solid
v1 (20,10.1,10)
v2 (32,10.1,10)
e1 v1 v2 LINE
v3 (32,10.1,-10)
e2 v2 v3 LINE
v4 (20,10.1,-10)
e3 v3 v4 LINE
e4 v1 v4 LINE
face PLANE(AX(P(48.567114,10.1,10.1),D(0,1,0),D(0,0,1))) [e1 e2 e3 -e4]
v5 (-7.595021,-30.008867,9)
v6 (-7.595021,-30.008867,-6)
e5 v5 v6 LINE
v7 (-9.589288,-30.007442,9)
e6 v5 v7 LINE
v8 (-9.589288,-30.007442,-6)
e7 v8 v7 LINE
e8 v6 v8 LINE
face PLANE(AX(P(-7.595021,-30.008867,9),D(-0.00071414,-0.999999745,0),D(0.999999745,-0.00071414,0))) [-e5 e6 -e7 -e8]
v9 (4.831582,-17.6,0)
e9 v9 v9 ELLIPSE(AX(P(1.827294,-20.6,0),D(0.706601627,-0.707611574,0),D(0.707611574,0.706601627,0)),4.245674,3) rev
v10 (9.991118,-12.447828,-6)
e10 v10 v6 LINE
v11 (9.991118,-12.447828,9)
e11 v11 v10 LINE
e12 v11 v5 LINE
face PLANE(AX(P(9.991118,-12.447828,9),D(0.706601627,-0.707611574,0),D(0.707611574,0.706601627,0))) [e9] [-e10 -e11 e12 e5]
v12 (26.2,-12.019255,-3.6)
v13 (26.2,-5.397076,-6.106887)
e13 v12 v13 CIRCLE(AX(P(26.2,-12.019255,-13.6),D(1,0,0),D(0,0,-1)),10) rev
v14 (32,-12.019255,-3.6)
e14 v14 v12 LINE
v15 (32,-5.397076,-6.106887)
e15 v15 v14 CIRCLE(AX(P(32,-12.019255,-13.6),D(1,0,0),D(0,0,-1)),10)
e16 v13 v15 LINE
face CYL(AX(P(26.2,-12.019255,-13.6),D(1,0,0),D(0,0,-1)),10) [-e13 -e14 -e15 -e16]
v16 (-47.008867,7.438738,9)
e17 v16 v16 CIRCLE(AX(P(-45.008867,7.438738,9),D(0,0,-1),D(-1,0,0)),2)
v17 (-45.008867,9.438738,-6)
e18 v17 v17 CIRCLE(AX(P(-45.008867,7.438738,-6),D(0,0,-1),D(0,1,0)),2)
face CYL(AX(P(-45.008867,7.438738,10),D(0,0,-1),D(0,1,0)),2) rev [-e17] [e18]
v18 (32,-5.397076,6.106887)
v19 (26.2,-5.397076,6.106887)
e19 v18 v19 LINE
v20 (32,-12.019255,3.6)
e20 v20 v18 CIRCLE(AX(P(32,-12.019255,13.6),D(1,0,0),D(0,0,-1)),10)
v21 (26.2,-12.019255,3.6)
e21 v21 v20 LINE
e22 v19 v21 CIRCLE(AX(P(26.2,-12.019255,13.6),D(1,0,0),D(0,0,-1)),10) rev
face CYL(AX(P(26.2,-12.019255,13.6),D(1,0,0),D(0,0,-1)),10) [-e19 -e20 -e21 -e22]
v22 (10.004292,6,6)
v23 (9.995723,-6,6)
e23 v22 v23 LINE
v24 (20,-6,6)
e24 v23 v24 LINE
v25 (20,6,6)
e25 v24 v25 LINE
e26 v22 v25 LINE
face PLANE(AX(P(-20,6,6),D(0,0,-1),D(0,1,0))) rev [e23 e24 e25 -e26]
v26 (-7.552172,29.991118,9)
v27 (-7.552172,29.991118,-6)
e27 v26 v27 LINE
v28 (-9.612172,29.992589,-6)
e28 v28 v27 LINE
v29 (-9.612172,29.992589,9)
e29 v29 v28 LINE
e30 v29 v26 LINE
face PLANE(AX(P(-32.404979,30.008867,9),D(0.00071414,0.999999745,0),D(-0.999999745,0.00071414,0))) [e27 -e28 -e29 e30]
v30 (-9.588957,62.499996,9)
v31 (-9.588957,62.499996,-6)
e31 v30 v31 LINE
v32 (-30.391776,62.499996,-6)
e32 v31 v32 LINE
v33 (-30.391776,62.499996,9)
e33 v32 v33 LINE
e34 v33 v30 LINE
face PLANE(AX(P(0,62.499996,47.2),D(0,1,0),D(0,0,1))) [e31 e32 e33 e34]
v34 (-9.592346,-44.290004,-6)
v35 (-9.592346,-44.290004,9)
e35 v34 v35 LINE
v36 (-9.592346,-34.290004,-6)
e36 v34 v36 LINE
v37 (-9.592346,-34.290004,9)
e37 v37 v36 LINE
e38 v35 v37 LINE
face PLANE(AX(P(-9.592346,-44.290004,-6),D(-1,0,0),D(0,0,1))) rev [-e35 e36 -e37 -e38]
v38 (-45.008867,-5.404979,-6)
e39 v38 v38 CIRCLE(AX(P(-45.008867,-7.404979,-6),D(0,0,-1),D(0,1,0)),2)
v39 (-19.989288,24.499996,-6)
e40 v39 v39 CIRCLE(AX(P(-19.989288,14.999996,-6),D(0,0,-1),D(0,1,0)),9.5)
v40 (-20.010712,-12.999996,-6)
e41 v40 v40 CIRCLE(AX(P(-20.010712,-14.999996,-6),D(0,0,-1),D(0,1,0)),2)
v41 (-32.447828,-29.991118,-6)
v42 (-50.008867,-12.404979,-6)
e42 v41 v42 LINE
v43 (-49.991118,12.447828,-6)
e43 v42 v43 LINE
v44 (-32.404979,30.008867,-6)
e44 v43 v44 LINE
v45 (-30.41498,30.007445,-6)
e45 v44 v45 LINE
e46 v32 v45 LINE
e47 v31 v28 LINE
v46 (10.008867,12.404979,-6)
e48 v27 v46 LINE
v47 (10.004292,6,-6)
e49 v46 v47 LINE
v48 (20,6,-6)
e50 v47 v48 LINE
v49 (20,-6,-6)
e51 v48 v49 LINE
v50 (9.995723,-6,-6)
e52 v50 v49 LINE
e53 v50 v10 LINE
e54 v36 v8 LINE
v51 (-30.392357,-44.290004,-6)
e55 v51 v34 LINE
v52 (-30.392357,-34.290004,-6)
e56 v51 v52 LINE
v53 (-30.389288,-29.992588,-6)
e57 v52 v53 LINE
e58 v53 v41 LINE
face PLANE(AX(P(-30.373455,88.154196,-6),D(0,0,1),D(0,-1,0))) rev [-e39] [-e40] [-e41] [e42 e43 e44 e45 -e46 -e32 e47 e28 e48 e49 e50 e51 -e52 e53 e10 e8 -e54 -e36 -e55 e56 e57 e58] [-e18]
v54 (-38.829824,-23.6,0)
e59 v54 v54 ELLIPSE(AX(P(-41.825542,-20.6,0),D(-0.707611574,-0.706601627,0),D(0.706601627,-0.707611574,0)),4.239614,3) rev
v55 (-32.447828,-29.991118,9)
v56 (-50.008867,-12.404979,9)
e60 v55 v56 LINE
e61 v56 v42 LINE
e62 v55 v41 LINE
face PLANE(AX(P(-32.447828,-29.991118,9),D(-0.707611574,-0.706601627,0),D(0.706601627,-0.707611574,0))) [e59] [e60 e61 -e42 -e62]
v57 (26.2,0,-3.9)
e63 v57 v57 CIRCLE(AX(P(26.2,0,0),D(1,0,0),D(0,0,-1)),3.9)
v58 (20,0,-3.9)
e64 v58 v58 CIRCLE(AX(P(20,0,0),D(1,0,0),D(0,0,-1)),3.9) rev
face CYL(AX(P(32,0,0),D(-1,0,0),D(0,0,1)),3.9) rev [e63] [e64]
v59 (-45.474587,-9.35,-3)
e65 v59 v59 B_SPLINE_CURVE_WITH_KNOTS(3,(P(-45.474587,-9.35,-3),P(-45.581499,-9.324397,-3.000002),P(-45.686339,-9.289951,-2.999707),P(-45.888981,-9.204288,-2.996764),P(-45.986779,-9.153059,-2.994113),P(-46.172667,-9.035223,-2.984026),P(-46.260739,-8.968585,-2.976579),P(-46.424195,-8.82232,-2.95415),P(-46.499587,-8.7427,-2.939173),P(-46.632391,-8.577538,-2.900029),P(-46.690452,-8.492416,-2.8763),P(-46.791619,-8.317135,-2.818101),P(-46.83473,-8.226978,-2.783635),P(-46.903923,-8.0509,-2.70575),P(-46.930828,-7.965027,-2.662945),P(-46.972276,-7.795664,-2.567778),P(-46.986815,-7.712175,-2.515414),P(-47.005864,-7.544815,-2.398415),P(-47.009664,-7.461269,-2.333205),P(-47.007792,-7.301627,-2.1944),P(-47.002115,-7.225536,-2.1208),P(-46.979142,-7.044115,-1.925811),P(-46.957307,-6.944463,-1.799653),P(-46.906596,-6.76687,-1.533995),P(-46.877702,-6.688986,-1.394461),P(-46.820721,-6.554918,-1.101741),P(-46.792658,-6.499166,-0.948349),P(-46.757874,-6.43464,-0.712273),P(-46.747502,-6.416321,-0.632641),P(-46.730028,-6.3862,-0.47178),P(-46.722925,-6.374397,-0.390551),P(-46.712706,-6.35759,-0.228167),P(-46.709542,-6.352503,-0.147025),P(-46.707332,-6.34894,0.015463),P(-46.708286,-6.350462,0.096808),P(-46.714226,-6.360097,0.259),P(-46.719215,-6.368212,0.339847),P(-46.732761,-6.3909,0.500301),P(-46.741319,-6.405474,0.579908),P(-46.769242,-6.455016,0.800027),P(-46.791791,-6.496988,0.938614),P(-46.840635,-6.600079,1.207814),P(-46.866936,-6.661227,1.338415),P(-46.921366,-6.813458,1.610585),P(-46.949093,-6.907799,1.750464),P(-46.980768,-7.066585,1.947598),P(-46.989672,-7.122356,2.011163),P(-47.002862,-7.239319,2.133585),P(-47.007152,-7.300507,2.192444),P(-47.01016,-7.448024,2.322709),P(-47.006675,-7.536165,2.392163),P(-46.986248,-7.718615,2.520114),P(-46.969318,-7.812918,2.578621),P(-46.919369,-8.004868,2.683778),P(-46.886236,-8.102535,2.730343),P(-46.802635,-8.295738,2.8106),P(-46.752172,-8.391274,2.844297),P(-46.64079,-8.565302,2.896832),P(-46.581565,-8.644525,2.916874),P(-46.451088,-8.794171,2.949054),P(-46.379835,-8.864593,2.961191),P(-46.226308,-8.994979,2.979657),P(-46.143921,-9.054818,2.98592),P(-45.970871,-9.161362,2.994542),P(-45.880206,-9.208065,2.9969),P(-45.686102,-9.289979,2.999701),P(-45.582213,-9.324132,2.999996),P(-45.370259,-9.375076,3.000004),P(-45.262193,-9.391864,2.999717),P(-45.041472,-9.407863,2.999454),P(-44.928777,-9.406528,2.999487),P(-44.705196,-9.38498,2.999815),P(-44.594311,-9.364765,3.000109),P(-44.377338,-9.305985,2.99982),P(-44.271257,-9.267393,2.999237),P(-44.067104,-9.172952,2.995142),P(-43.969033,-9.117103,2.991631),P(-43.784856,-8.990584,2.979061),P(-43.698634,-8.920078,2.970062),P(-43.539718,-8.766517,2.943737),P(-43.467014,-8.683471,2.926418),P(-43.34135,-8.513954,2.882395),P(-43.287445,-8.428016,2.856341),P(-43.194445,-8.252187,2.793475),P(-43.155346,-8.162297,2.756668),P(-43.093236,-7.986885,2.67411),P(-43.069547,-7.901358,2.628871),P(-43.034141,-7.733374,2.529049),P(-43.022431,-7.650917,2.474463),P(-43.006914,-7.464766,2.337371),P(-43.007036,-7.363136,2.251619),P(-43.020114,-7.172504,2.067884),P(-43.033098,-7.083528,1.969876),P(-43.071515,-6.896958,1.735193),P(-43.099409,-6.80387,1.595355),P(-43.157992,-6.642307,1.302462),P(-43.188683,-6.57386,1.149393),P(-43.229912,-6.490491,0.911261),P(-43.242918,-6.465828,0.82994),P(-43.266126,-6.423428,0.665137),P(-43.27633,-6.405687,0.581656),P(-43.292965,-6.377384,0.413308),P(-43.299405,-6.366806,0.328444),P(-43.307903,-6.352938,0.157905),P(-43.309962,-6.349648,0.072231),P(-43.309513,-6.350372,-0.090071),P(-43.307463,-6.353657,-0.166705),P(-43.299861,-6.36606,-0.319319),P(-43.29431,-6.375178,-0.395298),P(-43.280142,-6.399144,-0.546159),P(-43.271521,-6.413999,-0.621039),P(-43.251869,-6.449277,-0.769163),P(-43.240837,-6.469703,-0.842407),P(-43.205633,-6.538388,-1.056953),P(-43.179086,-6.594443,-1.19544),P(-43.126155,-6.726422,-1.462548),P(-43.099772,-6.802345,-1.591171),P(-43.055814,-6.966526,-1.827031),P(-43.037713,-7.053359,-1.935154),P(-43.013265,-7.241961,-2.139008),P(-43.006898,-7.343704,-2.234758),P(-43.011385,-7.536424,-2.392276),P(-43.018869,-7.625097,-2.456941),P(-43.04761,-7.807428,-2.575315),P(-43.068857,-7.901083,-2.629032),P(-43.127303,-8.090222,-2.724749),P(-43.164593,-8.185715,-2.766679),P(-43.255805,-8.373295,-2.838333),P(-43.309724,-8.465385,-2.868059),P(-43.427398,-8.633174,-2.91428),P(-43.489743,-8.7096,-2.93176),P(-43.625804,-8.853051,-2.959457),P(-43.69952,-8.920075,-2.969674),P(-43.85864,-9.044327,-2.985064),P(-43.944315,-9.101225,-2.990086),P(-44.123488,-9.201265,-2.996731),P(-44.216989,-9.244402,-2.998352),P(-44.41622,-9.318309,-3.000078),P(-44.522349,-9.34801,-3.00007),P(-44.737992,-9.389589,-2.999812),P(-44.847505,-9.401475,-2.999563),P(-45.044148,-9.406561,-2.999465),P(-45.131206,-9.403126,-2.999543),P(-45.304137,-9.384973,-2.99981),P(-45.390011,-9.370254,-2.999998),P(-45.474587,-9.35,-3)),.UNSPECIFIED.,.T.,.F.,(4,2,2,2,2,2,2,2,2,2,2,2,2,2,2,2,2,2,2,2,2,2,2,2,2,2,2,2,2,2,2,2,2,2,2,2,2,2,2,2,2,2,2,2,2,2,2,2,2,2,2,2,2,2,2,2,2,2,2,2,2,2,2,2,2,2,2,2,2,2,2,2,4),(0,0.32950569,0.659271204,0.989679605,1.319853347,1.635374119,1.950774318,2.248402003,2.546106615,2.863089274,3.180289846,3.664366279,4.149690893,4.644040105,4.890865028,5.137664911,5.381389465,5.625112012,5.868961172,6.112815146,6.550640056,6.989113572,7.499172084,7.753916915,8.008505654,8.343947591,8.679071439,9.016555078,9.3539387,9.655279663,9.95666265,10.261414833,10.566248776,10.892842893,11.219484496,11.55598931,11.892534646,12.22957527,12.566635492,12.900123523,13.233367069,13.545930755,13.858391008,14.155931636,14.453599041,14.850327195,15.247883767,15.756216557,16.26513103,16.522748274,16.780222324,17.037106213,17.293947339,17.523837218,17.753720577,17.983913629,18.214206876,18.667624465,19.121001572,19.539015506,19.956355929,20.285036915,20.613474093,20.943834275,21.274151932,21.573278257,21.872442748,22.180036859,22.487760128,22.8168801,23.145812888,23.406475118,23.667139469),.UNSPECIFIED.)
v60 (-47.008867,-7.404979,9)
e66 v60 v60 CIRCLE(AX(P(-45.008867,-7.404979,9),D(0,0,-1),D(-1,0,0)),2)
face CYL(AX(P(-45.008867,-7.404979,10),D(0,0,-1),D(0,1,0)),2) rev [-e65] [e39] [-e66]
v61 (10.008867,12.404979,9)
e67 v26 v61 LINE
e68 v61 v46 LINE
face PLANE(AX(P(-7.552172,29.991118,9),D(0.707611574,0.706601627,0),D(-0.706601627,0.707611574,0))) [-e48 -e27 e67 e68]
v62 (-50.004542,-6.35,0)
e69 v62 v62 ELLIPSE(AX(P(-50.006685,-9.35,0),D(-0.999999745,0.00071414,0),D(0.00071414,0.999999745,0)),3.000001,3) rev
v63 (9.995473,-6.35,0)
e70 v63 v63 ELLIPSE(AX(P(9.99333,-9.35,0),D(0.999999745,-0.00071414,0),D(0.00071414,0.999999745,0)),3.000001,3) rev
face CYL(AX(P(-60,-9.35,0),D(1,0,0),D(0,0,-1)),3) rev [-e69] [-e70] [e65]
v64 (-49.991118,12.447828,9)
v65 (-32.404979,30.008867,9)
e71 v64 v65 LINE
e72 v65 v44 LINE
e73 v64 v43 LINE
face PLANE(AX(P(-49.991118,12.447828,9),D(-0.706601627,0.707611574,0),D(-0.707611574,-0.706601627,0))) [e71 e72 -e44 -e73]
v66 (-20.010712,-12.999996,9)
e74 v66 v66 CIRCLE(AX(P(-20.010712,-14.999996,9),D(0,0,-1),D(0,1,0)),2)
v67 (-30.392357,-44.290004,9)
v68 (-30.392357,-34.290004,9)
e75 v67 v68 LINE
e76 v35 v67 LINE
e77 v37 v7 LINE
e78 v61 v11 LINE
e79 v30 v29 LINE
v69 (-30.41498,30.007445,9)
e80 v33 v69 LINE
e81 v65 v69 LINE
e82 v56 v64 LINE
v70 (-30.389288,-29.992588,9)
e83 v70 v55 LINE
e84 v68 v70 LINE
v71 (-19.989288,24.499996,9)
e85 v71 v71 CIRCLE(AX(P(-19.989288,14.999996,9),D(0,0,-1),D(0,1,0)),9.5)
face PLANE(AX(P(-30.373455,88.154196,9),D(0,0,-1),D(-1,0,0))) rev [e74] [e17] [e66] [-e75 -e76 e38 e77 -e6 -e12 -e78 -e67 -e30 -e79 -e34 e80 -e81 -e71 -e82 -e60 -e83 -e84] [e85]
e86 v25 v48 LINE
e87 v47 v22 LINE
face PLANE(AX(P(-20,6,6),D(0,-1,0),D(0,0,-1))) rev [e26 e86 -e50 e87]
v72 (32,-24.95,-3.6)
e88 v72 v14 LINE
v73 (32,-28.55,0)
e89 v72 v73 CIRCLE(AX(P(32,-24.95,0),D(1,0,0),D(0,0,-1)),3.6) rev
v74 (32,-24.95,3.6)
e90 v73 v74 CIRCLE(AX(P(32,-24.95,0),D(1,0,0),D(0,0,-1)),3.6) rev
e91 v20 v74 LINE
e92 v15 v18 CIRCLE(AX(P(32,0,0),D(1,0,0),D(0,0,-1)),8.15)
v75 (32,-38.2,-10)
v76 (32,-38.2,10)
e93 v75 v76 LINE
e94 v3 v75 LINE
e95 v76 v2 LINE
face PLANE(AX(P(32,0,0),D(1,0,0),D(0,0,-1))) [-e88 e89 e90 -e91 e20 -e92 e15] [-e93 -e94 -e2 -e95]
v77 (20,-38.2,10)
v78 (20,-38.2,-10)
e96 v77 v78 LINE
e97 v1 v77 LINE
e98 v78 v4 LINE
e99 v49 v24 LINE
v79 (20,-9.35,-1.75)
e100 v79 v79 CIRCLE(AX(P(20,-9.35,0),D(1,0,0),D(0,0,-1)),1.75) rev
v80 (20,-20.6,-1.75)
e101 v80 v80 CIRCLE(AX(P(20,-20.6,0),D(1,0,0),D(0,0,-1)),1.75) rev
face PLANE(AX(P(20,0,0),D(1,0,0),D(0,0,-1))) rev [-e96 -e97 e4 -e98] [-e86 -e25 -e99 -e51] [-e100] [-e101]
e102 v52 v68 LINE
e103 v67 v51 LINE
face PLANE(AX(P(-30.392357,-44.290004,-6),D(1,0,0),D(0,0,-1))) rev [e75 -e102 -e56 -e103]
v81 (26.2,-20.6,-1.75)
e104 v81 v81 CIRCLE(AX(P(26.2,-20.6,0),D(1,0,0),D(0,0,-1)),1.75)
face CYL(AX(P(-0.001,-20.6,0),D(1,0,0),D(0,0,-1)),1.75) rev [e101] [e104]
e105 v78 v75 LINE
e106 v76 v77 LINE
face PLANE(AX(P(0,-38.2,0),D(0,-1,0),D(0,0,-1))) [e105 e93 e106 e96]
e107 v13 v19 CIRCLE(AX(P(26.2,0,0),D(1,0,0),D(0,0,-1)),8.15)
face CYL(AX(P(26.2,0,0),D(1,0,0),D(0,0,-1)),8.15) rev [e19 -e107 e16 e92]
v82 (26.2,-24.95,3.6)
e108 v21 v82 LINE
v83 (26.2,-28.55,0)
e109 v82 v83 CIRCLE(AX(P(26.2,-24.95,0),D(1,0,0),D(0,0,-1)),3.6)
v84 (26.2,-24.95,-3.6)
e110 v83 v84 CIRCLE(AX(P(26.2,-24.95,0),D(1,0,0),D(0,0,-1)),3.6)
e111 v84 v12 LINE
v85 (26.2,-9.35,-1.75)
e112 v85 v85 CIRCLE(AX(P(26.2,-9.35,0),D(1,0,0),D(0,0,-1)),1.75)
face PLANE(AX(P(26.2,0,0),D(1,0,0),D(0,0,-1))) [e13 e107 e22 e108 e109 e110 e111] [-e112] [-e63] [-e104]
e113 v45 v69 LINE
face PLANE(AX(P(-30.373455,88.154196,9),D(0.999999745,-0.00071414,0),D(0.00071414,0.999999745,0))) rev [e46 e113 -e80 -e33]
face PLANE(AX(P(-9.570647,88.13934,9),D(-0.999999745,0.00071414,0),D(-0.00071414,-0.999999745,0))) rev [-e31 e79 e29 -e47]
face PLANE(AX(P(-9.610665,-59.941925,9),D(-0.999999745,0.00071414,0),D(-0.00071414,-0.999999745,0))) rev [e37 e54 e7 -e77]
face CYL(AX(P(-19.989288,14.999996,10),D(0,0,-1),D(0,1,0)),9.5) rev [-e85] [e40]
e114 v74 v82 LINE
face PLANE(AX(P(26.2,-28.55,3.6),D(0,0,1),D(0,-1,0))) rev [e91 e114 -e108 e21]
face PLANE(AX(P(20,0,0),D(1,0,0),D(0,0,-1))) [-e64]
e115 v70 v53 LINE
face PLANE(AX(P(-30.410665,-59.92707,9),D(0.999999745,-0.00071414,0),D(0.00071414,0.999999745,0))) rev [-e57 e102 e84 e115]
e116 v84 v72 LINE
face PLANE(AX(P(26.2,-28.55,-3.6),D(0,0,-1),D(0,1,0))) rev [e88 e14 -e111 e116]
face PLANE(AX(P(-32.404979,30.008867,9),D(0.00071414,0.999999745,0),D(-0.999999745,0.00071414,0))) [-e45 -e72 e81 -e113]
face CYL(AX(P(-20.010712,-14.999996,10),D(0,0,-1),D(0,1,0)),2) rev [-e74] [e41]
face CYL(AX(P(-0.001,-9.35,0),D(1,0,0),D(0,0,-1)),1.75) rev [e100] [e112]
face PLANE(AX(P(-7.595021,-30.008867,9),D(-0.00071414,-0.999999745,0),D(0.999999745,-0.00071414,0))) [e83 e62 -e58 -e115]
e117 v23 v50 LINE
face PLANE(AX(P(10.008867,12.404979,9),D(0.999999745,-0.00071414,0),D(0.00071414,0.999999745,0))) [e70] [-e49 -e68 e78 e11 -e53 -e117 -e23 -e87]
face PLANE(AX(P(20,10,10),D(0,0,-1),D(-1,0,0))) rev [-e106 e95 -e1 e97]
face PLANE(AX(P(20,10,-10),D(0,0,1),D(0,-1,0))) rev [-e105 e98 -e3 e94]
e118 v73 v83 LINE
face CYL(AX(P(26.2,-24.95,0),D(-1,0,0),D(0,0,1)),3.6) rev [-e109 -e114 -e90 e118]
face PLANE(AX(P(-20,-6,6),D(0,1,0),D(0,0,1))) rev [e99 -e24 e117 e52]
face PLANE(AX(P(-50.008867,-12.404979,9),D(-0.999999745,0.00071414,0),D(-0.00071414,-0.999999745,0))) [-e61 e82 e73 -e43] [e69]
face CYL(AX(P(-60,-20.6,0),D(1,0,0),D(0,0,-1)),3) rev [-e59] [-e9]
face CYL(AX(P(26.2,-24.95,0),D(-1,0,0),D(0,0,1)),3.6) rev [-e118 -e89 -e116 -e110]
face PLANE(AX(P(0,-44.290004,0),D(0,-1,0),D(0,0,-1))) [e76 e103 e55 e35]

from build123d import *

# Parameters (mm, degrees)
SKETCH1_W            = 20
SKETCH1_H            = 20
BOSS_EXTRUDE1_DEPTH  = 20
SKETCH2_W            = 45
SKETCH2_H            = 70
BOSS_EXTRUDE2_DEPTH  = 12
CUT_EXTRUDE1_DEPTH   = 5.8
FILLET1_R            = 3.6
FILLET2_R            = 10
SKETCH5_R            = 3.9
CUT_EXTRUDE2_DEPTH   = 53.490475326
CUT_EXTRUDE3_REACH   = 51.17
SKETCH6_R            = 1.75
SKETCH7_W            = 12
SKETCH7_H            = 45
CUT_EXTRUDE4_DEPTH   = 4.8
SKETCH9_W            = 12
SKETCH9_H            = 45
CUT_EXTRUDE5_DEPTH   = 23.8
SKETCH10_W           = 12.5
SKETCH10_H           = 41.4
CUT_EXTRUDE6_DEPTH   = 23.8
SKETCH11_W           = 20
SKETCH11_H           = 1.2
CUT_EXTRUDE7_DEPTH   = 23.8
BOSS_EXTRUDE3_START  = 20
SKETCH12_W           = 20
SKETCH12_H           = 20
SKETCH12_R           = 3.9
BOSS_EXTRUDE3_DEPTH  = 20
SKETCH13_W           = 20.2
SKETCH13_H           = 20.2
SKETCH13_R           = 3.9
BOSS_EXTRUDE4_DEPTH  = 40
SKETCH14_W           = 12
SKETCH14_H           = 20
BOSS_EXTRUDE5_DEPTH  = 0.1
SKETCH17_R           = 4.83091966
BOSS_EXTRUDE8_DEPTH  = 39
SKETCH18_W           = 20.2
SKETCH18_H           = 20.2
CUT_EXTRUDE8_DEPTH   = 40
SKETCH20_W           = 12
SKETCH20_H           = 20
BOSS_EXTRUDE9_DEPTH  = 8
SKETCH21_W           = 12
SKETCH21_H           = 12
BOSS_EXTRUDE10_DEPTH = 40
BOSS_EXTRUDE11_DEPTH = 15
SKETCH27_R           = 2
SKETCH27_R_2         = 9.5
CUT_EXTRUDE10_DEPTH  = 65.931708229
BOSS_EXTRUDE12_DEPTH = 38.2
BOSS_EXTRUDE13_REACH = 117.263
SKETCH29_W           = 20.800005304
SKETCH29_H           = 15
BOSS_EXTRUDE14_START = -6
BOSS_EXTRUDE14_DEPTH = 15
SKETCH33_W           = 20.8
SKETCH33_H           = 10
BOSS_EXTRUDE15_DEPTH = 8.09
SKETCH34_W           = 20.8
SKETCH34_H           = 10
BOSS_EXTRUDE16_DEPTH = 27.8
SKETCH35_W           = 20.8
SKETCH35_H           = 96.79
CUT_EXTRUDE11_DEPTH  = 38.2
SKETCH36_W           = 20.800010608
SKETCH36_H           = 15
BOSS_EXTRUDE17_DEPTH = 10
CUT_EXTRUDE12_DEPTH  = 82.628035964
SKETCH39_R           = 3
CUT_EXTRUDE13_DEPTH  = 80


# Read off the part's stored shape, not the designer's step: Boss-Extrude14
with BuildPart() as part:
    # Sketch1 → Boss-Extrude1 (new body)
    with BuildSketch(Plane(origin=(0, 0, 0), x_dir=(0, 0, -1), z_dir=(1, 0, 0))):
        Rectangle(SKETCH1_W, SKETCH1_H)
    extrude(amount=BOSS_EXTRUDE1_DEPTH)

    # Sketch2 → Boss-Extrude2 (add)
    with BuildSketch(Plane(origin=(20, 0, 0), x_dir=(0, 0, -1), z_dir=(1, 0, 0))):
        Rectangle(SKETCH2_W, SKETCH2_H)
    extrude(amount=BOSS_EXTRUDE2_DEPTH)

    # Sketch4 → Cut-Extrude1 (cut)
    with BuildSketch(Plane(origin=(32, 0, 0), x_dir=(0, 0, -1), z_dir=(1, 0, 0))):
        with BuildLine():
            Line((3.6, -28.55), (-3.6, -28.55))
            Line((-3.6, -28.55), (-3.6, -7.311805523))
            ThreePointArc((-3.6, -7.311805523), (0, 8.15), (3.6, -7.311805523))
            Line((3.6, -7.311805523), (3.6, -28.55))
        make_face()
    extrude(amount=-CUT_EXTRUDE1_DEPTH, mode=Mode.SUBTRACT)

    # Fillet1
    fillet1_edges = [part.edges().sort_by_distance(p)[0] for p in [
        (29.1, -28.55, 3.6),
        (29.1, -28.55, -3.6),
    ]]
    fillet(fillet1_edges, radius=FILLET1_R - 0.0001)  # a hair under: the kernel refuses the full size

    # Fillet2
    fillet2_edges = [part.edges().sort_by_distance(p)[0] for p in [
        (29.1, -7.311805523, 3.6),
        (29.1, -7.311805523, -3.6),
    ]]
    fillet(fillet2_edges, radius=FILLET2_R)

    # Sketch5 → Cut-Extrude2 (cut, through all)
    with BuildSketch(Plane.ZY):
        Circle(SKETCH5_R)
    extrude(amount=-CUT_EXTRUDE2_DEPTH, mode=Mode.SUBTRACT)

    # Sketch6 → Cut-Extrude3 (cut, up to next)
    with BuildSketch(Plane(origin=(26.2, 0, 0), x_dir=(0, 0, -1), z_dir=(1, 0, 0)), mode=Mode.PRIVATE) as cut_extrude3_sk1:
        with Locations((0, -20.6)):
            Circle(SKETCH6_R)
    cut_extrude3_tool1 = extrude(cut_extrude3_sk1.sketch, amount=-CUT_EXTRUDE3_REACH, mode=Mode.PRIVATE) & part.part
    # Sketch6 → Cut-Extrude3 (cut, up to next)
    with BuildSketch(Plane(origin=(26.2, 0, 0), x_dir=(0, 0, -1), z_dir=(1, 0, 0)), mode=Mode.PRIVATE) as cut_extrude3_sk2:
        with Locations((0, -9.35)):
            Circle(SKETCH6_R)
    cut_extrude3_tool2 = extrude(cut_extrude3_sk2.sketch, amount=-CUT_EXTRUDE3_REACH, mode=Mode.PRIVATE) & part.part
    add(cut_extrude3_tool1.solids().sort_by_distance((26.2, -20.6, 0))[0], mode=Mode.SUBTRACT)
    add(cut_extrude3_tool2.solids().sort_by_distance((26.2, -9.35, 0))[0], mode=Mode.SUBTRACT)

    # Sketch7 → Cut-Extrude4 (cut)
    with BuildSketch(Plane.XZ.offset(35)):
        with Locations((26, 0)):
            Rectangle(SKETCH7_W, SKETCH7_H)
    extrude(amount=-CUT_EXTRUDE4_DEPTH, mode=Mode.SUBTRACT)

    # Sketch9 → Cut-Extrude5 (cut)
    with BuildSketch(Plane(origin=(0, 35, 0), x_dir=(1, 0, 0), z_dir=(0, 1, 0))):
        with Locations((26, 0)):
            Rectangle(SKETCH9_W, SKETCH9_H)
    extrude(amount=-CUT_EXTRUDE5_DEPTH, mode=Mode.SUBTRACT)

    # Sketch10 → Cut-Extrude6 (cut)
    with BuildSketch(Plane.ZY.offset(-20)):
        with Locations((-16.25, -9.5)):
            Rectangle(SKETCH10_W, SKETCH10_H)
        with Locations((16.25, -9.5)):
            Rectangle(SKETCH10_W, SKETCH10_H)
    extrude(amount=-CUT_EXTRUDE6_DEPTH, mode=Mode.SUBTRACT)

    # Sketch11 → Cut-Extrude7 (cut)
    with BuildSketch(Plane.ZY.offset(-20)):
        with Locations((0, 10.6)):
            Rectangle(SKETCH11_W, SKETCH11_H)
    extrude(amount=-CUT_EXTRUDE7_DEPTH, mode=Mode.SUBTRACT)

    # Sketch12 → Boss-Extrude3 (add)
    with BuildSketch(Plane.ZY.offset(BOSS_EXTRUDE3_START)):
        Rectangle(SKETCH12_W, SKETCH12_H)
        Circle(SKETCH12_R, mode=Mode.SUBTRACT)
    extrude(amount=-BOSS_EXTRUDE3_DEPTH)

    # Sketch13 → Boss-Extrude4 (add)
    with BuildSketch(Plane.ZY.offset(20)):
        Rectangle(SKETCH13_W, SKETCH13_H)
        Circle(SKETCH13_R, mode=Mode.SUBTRACT)
    extrude(amount=-BOSS_EXTRUDE4_DEPTH)

    # Sketch14 → Boss-Extrude5 (add)
    with BuildSketch(Plane(origin=(0, 10, 0), x_dir=(1, 0, 0), z_dir=(0, 1, 0))):
        with Locations((26, 0)):
            Rectangle(SKETCH14_W, SKETCH14_H)
    extrude(amount=BOSS_EXTRUDE5_DEPTH)

    # Sketch17 → Boss-Extrude8 (add)
    with BuildSketch(Plane.ZY.offset(20)):
        Circle(SKETCH17_R)
    extrude(amount=-BOSS_EXTRUDE8_DEPTH)

    # Sketch18 → Cut-Extrude8 (cut)
    with BuildSketch(Plane.ZY.offset(20)):
        Rectangle(SKETCH18_W, SKETCH18_H)
    extrude(amount=-CUT_EXTRUDE8_DEPTH, mode=Mode.SUBTRACT)

    # Sketch20 → Boss-Extrude9 (add)
    with BuildSketch(Plane.XZ.offset(30.2)):
        with Locations((26, 0)):
            Rectangle(SKETCH20_W, SKETCH20_H)
    extrude(amount=BOSS_EXTRUDE9_DEPTH)

    # Sketch21 → Boss-Extrude10 (add)
    with BuildSketch(Plane.ZY.offset(-20)):
        Rectangle(SKETCH21_W, SKETCH21_H)
    extrude(amount=BOSS_EXTRUDE10_DEPTH)

    # Sketch22 → Boss-Extrude11 (add)
    with BuildSketch(Plane(origin=(0, 0, -6), x_dir=(-1, 0, 0), z_dir=(0, 0, -1))):
        Polygon((49.991118151, 12.447827913), (32.404979492, 30.008866549), (7.552172087, 29.991118151), (-10.008866549, 12.404979492), (-9.991118151, -12.447827913), (7.595020508, -30.008866549), (32.447827913, -29.991118151), (50.008866549, -12.404979492), align=None)
    extrude(amount=-BOSS_EXTRUDE11_DEPTH)

    # Sketch27 → Cut-Extrude10 (cut, through all)
    with BuildSketch(Plane(origin=(0, 0, -6), x_dir=(-1, 0, 0), z_dir=(0, 0, -1))):
        with Locations(Location((20.010712105, -14.999996175, 0), (0, 0, 90))):
            Circle(SKETCH27_R)
        with Locations(Location((19.989287895, 14.999996175, 0), (0, 0, 90))):
            Circle(SKETCH27_R_2)
    extrude(amount=-CUT_EXTRUDE10_DEPTH, mode=Mode.SUBTRACT)

    # Sketch26 → Boss-Extrude12 (add)
    with BuildSketch(Plane.XY.offset(9)):
        Polygon((-30.389287895, 52.499996175), (-19.989287895, 52.499996175), (-9.589287895, 52.499996175), (-9.589287895, 62.499996175), (-30.389287895, 62.499996175), align=None)
        Polygon((-9.589287895, -30.007442362), (-30.389287895, -29.992588238), (-30.389287895, -34.290003825), (-9.589287895, -34.290003825), align=None)
        Polygon((-9.589287895, -24.290003825), (-30.389287895, -24.290003825), (-30.389287895, -29.992588238), (-9.589287895, -30.007442362), align=None)
    extrude(amount=BOSS_EXTRUDE12_DEPTH)


with BuildPart() as boss_extrude12_piece_1:
    # of the separate pieces the step leaves, piece 1, a body of its own (boss_extrude12_pieces)
    add(part.part.solids().sort_by_distance((32, -38.2, -10))[0])

    # Boss-Extrude13: up to this plane
    boss_extrude13_end = Plane(origin=(0, -34.290003825, 47.2), z_dir=(0, 1, 0))
    # Sketch29 → Boss-Extrude13 (add, up to the surface)
    with BuildSketch(Plane(origin=(-0.021434411, -30.014275154, 0), x_dir=(0.999999745001739, -0.0007141403622172189, 0), z_dir=(-0.0007141403622172189, -0.999999745001739, 0)), mode=Mode.PRIVATE) as boss_extrude13_sk1:
        with Locations((-19.967858576, 1.5)):
            Rectangle(SKETCH29_W, SKETCH29_H)
    boss_extrude13_tool1 = split(extrude(boss_extrude13_sk1.sketch, amount=BOSS_EXTRUDE13_REACH, mode=Mode.PRIVATE), bisect_by=boss_extrude13_end, keep=Keep.BOTH, mode=Mode.PRIVATE)
    add(boss_extrude13_tool1.solids().sort_by_distance((-19.989288, -30.000015, 1.5))[0])



with BuildPart() as boss_extrude12_piece_2:
    # of the separate pieces the step leaves, piece 2, a body of its own (boss_extrude12_pieces)
    add(part.part.solids().sort_by_distance((-9.589287895, 62.499996175, 9))[0])


with BuildPart() as boss_extrude12_piece_1_1:
    add(boss_extrude12_piece_1.part)

    add(boss_extrude12_piece_2.part)  # Boss-Extrude14 merges Boss-Extrude12 piece 2
    # Boss-Extrude14 outline → Boss-Extrude14 (add)
    with BuildSketch(Plane.XY.offset(BOSS_EXTRUDE14_START)):
        Polygon((-9.612171561, 29.99258928), (-9.588956704, 62.499996175), (-30.391775751, 62.499996175), (-30.414979999, 30.007445409), align=None)
    extrude(amount=BOSS_EXTRUDE14_DEPTH)

    # Sketch33 → Boss-Extrude15 (add)
    with BuildSketch(Plane(origin=(0, -24.290003825, 0), x_dir=(1, 0, 0), z_dir=(0, 1, 0))):
        with Locations((-19.989287895, -42.2)):
            Rectangle(SKETCH33_W, SKETCH33_H)
    extrude(amount=BOSS_EXTRUDE15_DEPTH)

    # Sketch34 → Boss-Extrude16 (add)
    with BuildSketch(Plane.XZ.offset(-52.499996175)):
        with Locations((-19.989287895, 42.2)):
            Rectangle(SKETCH34_W, SKETCH34_H)
    extrude(amount=BOSS_EXTRUDE16_DEPTH)

    # Sketch35 → Cut-Extrude11 (cut)
    with BuildSketch(Plane.XY.offset(47.2)):
        with Locations((-19.989287895, 14.104996175)):
            Rectangle(SKETCH35_W, SKETCH35_H)
    extrude(amount=-CUT_EXTRUDE11_DEPTH, mode=Mode.SUBTRACT)

    # Sketch36 → Boss-Extrude17 (add)
    with BuildSketch(Plane.XZ.offset(34.290003825)):
        with Locations((-19.992351549, 1.5)):
            Rectangle(SKETCH36_W, SKETCH36_H)
    extrude(amount=BOSS_EXTRUDE17_DEPTH)

    # Sketch38 → Cut-Extrude12 (cut, through all)
    with BuildSketch(Plane(origin=(0, 0, -6), x_dir=(-1, 0, 0), z_dir=(0, 0, -1))):
        with BuildLine():
            ThreePointArc((45.008866549, -5.404979492), (43.008866549, -7.404979492), (45.008866549, -9.404979492))
            Line((45.008866549, -9.404979492), (45.008866549, -7.404979492))
            Line((45.008866549, -7.404979492), (45.008866549, -5.404979492))
        make_face()
        with BuildLine():
            Line((45.008866549, -7.404979492), (45.008866549, -9.404979492))
            ThreePointArc((45.008866549, -9.404979492), (46.423080111, -8.819193054), (47.008866549, -7.404979492))
            ThreePointArc((47.008866549, -7.404979492), (46.423080111, -5.990765929), (45.008866549, -5.404979492))
            Line((45.008866549, -5.404979492), (45.008866549, -7.404979492))
        make_face()
        with BuildLine():
            ThreePointArc((45.008866549, 9.438738179), (43.008866549, 7.438738179), (45.008866549, 5.438738179))
            Line((45.008866549, 5.438738179), (45.008866549, 7.438738179))
            Line((45.008866549, 7.438738179), (45.008866549, 9.438738179))
        make_face()
        with BuildLine():
            Line((45.008866549, 7.438738179), (45.008866549, 5.438738179))
            ThreePointArc((45.008866549, 5.438738179), (46.423080111, 6.024524616), (47.008866549, 7.438738179))
            ThreePointArc((47.008866549, 7.438738179), (46.423080111, 8.852951741), (45.008866549, 9.438738179))
            Line((45.008866549, 9.438738179), (45.008866549, 7.438738179))
        make_face()
    extrude(amount=-CUT_EXTRUDE12_DEPTH, mode=Mode.SUBTRACT)

    # Sketch39 → Cut-Extrude13 (cut)
    with BuildSketch(Plane.ZY.offset(-20)):
        with Locations(Location((0, -20.6, 0), (0, 0, 90))):
            Circle(SKETCH39_R)
        with Locations(Location((0, -9.35, 0), (0, 0, 90))):
            Circle(SKETCH39_R)
    extrude(amount=CUT_EXTRUDE13_DEPTH, mode=Mode.SUBTRACT)


solid = boss_extrude12_piece_1_1.part
